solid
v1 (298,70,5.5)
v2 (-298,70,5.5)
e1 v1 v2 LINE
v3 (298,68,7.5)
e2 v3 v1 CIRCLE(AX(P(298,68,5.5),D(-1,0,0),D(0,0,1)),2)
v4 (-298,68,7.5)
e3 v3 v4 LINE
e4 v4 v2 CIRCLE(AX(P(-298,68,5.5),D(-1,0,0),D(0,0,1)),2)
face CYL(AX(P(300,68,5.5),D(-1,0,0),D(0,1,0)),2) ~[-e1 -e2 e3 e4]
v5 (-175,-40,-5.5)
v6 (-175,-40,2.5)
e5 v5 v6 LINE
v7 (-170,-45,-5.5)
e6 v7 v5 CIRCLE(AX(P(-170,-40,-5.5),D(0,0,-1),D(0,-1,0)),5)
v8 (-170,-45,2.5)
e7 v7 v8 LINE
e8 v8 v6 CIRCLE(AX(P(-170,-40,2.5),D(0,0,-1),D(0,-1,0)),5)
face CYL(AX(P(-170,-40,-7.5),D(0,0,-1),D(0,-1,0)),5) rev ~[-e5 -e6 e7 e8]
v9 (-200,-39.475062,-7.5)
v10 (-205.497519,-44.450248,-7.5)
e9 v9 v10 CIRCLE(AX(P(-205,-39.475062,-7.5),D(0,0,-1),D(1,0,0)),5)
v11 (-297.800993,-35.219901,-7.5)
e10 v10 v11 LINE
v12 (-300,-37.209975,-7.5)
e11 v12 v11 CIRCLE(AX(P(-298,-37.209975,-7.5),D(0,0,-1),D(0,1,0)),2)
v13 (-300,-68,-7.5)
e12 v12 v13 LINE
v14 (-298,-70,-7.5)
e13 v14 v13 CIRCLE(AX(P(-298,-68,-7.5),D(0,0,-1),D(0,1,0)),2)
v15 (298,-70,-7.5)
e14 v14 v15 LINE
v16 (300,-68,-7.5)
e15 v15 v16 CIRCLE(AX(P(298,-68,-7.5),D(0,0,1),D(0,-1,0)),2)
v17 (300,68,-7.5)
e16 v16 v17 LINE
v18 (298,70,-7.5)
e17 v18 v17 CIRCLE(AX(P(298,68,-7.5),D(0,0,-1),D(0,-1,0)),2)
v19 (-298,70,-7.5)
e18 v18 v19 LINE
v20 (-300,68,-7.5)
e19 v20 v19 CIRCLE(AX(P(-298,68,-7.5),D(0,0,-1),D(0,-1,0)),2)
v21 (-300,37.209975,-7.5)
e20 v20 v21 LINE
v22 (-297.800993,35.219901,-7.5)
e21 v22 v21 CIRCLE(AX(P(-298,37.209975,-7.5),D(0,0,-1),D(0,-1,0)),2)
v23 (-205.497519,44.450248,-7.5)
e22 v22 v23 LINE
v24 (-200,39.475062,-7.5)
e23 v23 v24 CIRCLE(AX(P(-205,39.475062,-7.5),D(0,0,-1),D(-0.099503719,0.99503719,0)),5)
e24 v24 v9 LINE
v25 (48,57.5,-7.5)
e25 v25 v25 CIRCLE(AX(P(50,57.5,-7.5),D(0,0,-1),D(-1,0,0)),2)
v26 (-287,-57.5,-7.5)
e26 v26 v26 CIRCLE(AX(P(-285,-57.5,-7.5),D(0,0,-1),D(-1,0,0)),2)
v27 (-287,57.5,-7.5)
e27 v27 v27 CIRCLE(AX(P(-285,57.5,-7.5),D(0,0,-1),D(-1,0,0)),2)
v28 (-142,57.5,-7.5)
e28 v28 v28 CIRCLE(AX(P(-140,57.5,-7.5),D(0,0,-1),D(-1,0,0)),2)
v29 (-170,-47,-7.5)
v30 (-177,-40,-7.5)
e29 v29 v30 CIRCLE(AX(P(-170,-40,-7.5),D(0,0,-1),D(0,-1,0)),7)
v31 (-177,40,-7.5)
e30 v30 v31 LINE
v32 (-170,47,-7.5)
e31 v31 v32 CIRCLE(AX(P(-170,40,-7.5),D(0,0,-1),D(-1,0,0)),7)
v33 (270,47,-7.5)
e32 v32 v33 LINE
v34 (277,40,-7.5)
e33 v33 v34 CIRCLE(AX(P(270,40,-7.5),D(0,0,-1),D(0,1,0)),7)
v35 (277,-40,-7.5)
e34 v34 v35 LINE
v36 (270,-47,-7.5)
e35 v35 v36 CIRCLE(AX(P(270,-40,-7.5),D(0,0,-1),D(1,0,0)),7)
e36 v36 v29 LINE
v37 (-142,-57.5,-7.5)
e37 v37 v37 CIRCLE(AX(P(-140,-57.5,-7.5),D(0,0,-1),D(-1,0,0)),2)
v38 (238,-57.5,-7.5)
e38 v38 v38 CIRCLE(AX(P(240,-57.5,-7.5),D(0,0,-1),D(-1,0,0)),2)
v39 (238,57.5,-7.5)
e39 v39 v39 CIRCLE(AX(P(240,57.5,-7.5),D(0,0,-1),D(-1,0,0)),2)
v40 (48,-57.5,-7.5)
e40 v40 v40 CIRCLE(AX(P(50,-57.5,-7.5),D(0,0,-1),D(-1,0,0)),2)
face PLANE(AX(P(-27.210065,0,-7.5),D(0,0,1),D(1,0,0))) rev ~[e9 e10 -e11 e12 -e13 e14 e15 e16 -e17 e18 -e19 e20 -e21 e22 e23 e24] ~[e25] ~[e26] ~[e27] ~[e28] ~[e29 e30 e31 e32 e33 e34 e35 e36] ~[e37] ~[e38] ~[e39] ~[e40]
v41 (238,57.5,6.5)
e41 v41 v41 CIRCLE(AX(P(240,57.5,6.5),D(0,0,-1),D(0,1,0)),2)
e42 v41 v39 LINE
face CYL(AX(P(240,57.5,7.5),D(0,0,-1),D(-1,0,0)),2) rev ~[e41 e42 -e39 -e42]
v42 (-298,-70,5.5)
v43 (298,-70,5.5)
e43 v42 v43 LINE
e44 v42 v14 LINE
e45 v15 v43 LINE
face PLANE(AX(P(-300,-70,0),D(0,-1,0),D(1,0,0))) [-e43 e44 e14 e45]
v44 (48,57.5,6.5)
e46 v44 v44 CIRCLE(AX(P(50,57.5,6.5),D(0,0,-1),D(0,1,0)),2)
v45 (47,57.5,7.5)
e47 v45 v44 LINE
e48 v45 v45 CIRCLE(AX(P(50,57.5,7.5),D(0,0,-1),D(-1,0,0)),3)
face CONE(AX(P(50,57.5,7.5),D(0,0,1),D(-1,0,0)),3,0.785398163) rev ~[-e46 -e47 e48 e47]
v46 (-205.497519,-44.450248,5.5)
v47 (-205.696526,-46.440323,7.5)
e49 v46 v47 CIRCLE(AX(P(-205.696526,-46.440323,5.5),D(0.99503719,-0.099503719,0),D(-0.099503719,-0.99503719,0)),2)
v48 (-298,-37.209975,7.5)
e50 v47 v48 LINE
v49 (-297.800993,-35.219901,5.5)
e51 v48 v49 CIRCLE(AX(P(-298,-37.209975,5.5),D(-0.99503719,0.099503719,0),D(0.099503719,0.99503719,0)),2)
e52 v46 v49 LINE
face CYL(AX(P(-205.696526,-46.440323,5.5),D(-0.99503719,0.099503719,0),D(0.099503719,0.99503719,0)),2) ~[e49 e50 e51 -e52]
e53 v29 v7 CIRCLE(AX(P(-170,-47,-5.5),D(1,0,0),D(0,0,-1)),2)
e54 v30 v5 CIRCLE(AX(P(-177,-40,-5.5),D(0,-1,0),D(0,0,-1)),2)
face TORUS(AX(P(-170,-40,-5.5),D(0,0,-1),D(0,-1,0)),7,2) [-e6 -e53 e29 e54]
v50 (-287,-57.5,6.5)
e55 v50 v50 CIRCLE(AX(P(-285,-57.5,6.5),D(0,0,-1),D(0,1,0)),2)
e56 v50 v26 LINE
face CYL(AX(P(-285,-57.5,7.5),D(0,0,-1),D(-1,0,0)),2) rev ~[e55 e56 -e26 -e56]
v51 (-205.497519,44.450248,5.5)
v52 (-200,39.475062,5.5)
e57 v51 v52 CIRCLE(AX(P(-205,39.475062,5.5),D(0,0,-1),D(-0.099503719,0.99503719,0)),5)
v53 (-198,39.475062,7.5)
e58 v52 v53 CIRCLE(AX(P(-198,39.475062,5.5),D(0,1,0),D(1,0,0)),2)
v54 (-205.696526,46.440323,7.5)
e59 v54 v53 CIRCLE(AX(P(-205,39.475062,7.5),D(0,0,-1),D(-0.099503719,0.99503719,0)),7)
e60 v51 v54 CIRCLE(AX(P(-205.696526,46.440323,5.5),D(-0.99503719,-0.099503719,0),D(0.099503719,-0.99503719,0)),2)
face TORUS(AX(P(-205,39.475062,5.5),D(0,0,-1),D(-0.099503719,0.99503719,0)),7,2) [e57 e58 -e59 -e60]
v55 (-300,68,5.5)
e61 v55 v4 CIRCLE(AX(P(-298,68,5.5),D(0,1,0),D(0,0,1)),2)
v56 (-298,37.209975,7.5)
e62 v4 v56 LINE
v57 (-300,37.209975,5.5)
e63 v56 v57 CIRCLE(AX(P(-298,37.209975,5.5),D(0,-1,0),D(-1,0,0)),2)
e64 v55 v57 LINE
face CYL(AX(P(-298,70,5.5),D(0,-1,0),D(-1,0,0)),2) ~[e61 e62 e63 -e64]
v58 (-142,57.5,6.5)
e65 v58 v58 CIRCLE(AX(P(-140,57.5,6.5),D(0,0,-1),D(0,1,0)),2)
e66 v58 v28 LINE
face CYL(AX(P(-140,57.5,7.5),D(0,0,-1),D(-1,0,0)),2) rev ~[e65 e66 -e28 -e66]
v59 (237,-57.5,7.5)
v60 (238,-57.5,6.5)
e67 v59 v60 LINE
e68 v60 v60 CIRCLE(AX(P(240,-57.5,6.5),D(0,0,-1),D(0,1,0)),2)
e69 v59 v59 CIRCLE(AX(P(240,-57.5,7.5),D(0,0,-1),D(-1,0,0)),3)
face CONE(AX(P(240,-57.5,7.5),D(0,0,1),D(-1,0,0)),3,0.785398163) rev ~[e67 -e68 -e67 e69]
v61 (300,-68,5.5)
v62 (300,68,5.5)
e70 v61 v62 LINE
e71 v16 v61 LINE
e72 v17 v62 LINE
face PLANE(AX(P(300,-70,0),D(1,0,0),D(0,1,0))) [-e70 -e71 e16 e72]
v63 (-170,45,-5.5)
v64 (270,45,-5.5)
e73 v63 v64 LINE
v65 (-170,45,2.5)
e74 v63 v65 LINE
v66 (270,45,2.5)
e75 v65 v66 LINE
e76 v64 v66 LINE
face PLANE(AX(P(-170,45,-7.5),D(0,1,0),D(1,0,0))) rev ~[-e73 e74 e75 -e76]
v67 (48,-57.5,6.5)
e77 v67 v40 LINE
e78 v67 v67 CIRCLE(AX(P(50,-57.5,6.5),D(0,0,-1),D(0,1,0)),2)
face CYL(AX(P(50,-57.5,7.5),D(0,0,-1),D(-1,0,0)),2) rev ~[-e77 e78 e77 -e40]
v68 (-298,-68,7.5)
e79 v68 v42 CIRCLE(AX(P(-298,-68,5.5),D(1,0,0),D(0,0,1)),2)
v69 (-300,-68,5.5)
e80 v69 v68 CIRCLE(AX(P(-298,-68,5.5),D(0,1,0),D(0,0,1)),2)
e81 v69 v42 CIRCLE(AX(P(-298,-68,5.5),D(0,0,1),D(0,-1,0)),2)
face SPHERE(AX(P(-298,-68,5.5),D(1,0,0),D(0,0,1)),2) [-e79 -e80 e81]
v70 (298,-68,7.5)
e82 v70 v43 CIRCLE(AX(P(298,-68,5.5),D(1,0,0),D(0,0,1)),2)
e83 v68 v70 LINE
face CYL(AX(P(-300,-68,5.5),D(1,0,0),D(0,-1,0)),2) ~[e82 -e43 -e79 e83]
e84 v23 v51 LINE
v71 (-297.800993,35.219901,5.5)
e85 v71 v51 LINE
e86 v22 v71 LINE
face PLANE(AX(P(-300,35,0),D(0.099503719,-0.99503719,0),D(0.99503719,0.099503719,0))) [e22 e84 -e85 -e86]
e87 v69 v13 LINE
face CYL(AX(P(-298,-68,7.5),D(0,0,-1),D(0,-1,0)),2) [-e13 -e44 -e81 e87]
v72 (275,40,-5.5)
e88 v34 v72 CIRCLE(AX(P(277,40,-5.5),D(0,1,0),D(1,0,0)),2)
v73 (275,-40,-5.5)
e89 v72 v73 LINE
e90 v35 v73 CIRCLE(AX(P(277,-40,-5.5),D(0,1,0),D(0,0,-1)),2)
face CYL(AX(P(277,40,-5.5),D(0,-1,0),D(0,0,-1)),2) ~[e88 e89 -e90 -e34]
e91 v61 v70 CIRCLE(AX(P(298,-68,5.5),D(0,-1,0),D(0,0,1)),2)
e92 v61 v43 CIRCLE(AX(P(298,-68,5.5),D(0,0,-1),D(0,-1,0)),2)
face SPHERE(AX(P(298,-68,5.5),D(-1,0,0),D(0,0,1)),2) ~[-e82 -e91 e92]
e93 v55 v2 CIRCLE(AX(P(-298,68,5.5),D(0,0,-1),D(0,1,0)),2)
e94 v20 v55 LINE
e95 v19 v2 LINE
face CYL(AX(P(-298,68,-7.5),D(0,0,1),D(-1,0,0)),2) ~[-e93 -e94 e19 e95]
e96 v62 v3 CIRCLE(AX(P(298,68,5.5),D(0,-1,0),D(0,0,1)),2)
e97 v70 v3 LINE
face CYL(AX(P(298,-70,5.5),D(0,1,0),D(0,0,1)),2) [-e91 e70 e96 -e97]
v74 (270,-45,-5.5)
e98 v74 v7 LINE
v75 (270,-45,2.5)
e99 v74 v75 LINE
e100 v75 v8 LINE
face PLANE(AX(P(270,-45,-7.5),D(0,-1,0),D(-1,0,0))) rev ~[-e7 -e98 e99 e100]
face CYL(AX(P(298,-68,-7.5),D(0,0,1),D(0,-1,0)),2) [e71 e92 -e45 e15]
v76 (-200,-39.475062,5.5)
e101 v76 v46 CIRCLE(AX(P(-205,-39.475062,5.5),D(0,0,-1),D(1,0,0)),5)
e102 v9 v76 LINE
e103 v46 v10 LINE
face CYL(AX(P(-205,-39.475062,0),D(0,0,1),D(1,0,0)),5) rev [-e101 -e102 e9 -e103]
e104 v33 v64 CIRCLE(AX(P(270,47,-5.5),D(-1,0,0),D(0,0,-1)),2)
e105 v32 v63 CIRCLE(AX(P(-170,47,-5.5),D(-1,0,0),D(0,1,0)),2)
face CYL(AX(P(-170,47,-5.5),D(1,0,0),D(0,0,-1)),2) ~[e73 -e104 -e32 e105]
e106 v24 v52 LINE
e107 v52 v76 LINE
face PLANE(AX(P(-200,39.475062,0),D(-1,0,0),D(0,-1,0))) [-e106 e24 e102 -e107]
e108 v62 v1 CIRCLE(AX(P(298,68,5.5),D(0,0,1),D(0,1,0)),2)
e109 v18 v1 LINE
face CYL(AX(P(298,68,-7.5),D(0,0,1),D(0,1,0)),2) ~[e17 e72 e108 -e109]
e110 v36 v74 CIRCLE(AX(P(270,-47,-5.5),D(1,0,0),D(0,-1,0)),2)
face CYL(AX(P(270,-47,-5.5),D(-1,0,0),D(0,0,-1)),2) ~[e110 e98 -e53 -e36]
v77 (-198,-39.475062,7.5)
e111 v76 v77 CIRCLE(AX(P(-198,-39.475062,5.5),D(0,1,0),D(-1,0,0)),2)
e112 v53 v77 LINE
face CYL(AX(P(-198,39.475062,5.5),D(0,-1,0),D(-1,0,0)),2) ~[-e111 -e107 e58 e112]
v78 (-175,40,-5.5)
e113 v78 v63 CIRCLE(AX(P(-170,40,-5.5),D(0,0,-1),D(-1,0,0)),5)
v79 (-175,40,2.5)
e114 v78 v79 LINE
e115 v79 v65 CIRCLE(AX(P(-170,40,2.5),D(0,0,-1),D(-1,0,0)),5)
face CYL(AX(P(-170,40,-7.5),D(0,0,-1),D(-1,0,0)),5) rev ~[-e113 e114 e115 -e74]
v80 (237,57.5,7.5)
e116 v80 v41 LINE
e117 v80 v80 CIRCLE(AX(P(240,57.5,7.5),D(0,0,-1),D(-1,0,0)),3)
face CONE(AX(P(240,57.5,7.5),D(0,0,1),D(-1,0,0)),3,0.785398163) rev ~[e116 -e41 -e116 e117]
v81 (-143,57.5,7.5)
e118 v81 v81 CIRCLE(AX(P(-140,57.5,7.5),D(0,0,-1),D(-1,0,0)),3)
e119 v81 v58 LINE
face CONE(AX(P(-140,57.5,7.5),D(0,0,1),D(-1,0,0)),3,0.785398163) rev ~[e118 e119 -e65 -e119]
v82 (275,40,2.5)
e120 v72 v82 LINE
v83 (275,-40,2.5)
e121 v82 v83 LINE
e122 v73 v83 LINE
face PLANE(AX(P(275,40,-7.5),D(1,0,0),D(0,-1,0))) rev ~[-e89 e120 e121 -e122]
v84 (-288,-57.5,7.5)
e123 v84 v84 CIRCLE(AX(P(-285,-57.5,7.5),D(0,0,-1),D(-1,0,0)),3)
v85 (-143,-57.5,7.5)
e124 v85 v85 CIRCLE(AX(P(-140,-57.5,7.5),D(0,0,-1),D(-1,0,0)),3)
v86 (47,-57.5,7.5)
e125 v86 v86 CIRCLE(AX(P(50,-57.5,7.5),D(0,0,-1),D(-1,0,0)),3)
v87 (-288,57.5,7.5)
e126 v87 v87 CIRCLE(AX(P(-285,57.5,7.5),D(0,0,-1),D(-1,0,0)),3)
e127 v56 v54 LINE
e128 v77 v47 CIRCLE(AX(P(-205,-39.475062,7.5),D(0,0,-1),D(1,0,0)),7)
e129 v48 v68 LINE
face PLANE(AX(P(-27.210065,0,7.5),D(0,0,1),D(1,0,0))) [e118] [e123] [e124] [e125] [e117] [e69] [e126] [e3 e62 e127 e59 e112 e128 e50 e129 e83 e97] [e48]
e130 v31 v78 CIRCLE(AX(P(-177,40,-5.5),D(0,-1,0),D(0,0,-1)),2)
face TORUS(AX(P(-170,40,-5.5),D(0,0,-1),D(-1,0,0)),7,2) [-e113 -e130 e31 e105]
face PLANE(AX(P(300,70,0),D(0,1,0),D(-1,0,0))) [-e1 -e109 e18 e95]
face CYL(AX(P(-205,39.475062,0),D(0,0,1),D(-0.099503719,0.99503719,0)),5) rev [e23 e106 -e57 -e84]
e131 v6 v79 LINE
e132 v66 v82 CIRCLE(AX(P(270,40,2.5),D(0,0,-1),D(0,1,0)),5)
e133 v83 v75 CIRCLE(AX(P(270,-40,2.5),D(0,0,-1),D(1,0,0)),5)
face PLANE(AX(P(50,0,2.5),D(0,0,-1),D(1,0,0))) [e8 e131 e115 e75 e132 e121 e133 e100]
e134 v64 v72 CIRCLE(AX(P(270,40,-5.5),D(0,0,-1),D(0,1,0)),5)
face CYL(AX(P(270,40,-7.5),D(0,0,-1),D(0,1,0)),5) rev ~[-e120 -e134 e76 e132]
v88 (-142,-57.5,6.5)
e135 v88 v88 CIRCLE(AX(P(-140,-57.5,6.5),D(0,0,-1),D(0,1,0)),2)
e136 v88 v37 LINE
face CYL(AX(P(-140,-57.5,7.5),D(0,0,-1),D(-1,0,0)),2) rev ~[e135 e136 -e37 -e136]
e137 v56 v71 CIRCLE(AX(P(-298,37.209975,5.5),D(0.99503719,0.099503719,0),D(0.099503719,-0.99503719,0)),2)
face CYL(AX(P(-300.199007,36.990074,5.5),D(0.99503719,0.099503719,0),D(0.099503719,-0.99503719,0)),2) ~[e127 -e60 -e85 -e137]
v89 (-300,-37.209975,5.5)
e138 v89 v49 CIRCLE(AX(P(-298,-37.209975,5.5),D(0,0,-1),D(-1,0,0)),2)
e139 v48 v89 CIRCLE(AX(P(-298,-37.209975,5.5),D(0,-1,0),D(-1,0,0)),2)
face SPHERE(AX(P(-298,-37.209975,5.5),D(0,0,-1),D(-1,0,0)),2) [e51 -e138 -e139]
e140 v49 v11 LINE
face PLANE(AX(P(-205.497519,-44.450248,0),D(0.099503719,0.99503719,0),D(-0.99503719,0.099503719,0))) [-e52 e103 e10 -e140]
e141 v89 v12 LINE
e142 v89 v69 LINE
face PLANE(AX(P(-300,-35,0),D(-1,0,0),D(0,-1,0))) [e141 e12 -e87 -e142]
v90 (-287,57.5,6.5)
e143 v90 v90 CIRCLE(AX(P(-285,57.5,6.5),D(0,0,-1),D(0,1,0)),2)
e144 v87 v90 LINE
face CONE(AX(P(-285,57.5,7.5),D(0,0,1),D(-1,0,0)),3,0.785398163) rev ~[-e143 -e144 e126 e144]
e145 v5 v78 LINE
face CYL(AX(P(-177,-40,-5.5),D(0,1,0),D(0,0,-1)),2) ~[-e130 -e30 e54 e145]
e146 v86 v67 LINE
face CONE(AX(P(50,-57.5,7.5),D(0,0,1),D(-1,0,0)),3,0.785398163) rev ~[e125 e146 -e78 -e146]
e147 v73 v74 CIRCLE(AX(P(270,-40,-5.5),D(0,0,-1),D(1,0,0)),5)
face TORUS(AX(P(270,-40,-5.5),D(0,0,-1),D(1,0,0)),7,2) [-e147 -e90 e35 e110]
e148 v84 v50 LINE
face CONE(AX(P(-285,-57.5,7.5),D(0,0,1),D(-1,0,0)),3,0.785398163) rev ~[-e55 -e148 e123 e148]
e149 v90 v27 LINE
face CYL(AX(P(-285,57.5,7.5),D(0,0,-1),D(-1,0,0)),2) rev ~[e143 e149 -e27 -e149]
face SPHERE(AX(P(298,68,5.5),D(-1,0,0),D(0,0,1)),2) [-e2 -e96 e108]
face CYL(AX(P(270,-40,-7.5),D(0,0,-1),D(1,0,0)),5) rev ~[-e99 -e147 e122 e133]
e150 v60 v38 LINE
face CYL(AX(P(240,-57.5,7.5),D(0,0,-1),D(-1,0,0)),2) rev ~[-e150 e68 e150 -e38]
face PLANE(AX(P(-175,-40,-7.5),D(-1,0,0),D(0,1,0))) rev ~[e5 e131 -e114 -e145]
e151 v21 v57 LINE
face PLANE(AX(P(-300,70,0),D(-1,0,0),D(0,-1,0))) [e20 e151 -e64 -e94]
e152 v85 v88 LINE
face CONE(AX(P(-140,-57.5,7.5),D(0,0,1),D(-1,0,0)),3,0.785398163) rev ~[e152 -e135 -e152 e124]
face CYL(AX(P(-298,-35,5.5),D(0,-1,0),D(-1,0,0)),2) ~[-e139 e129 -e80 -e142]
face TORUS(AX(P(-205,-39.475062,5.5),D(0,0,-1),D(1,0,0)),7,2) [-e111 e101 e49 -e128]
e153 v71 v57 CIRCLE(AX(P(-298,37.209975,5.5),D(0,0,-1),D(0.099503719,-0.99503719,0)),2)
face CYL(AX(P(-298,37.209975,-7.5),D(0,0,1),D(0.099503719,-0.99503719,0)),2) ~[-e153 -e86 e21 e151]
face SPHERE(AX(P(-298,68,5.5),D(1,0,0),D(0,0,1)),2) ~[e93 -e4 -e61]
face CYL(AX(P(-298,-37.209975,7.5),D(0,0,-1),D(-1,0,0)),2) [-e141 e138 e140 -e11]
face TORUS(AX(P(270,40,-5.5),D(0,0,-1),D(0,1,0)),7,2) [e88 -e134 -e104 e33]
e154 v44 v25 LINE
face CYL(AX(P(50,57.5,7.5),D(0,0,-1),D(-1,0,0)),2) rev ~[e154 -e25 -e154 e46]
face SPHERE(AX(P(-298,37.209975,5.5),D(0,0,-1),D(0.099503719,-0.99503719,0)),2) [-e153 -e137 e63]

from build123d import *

# Parameters (mm, degrees)
F1_DEPTH       = 7.5
F3_DEPTH       = 10
F5_D           = 4
F5_CSINK_D     = 6
F5_CSINK_ANGLE = 90
F6_R           = 2


# Not quite as in the source:
# - a feature names something its author has since deleted; it is built from what else it names


with BuildPart() as f1:
    # F0 (on Top) → F1 (new body, symmetric)
    with BuildSketch(Plane.XY):
        with BuildLine():
            Line((-300, -70), (300, -70))
            Line((300, -70), (300, 70))
            Line((300, 70), (-300, 70))
            Line((-300, 70), (-300, 35))
            Line((-300, 35), (-205.4975185951, 44.4502481405))
            ThreePointArc((-205.4975185951, 44.4502481405), (-201.6449733962, 43.1823248572), (-200, 39.4750621894))
            Line((-200, 39.4750621894), (-200, 0))
            Line((-200, 0), (-200, -39.4750621894))
            ThreePointArc((-200, -39.4750621894), (-201.6449733962, -43.1823248572), (-205.4975185951, -44.4502481405))
            Line((-205.4975185951, -44.4502481405), (-300, -35))
            Line((-300, -35), (-300, -70))
        make_face()
    extrude(amount=F1_DEPTH, both=True)

    # F2 (on face) → F3 (cut)
    with BuildSketch(Plane(origin=(0, 0, -7.5), x_dir=(1, 0, 0), z_dir=(0, 0, -1))):
        with BuildLine():
            Line((-175, 40), (-175, 0))
            Line((-175, 0), (-175, -40))
            ThreePointArc((-175, -40), (-173.5355339059, -43.5355339059), (-170, -45))
            Line((-170, -45), (270, -45))
            ThreePointArc((270, -45), (273.5355339059, -43.5355339059), (275, -40))
            Line((275, -40), (275, 0))
            Line((275, 0), (275, 40))
            ThreePointArc((275, 40), (273.5355339059, 43.5355339059), (270, 45))
            Line((270, 45), (-170, 45))
            ThreePointArc((-170, 45), (-173.5355339059, 43.5355339059), (-175, 40))
        make_face()
    extrude(amount=-F3_DEPTH, mode=Mode.SUBTRACT)

    # F5 (through all)
    with Locations(Plane.XY.offset(7.5)):
        with Locations((-285, 57.5), (-285, -57.5), (-140, -57.5), (50, -57.5), (240, -57.5), (240, 57.5), (50, 57.5), (-140, 57.5)):
            CounterSinkHole(F5_D / 2, F5_CSINK_D / 2, counter_sink_angle=F5_CSINK_ANGLE)

    # F6
    f6_edges = [f1.edges().sort_by_distance(p)[0] for p in [
        (0, -70, 7.5),
        (-300, -52.5, 7.5),
        (-252.748759, -39.725124, 7.5),
        (0, 70, 7.5),
        (-300, 52.5, 7.5),
        (300, 0, 7.5),
        (-175, 0, -7.5),
        (-300, 35, 0),
        (-300, -70, 0),
        (-300, 70, 0),
        (300, 70, 0),
        (300, -70, 0),
        (-300, -35, 0),
    ]]
    fillet(f6_edges, radius=F6_R)


solid = f1.part
